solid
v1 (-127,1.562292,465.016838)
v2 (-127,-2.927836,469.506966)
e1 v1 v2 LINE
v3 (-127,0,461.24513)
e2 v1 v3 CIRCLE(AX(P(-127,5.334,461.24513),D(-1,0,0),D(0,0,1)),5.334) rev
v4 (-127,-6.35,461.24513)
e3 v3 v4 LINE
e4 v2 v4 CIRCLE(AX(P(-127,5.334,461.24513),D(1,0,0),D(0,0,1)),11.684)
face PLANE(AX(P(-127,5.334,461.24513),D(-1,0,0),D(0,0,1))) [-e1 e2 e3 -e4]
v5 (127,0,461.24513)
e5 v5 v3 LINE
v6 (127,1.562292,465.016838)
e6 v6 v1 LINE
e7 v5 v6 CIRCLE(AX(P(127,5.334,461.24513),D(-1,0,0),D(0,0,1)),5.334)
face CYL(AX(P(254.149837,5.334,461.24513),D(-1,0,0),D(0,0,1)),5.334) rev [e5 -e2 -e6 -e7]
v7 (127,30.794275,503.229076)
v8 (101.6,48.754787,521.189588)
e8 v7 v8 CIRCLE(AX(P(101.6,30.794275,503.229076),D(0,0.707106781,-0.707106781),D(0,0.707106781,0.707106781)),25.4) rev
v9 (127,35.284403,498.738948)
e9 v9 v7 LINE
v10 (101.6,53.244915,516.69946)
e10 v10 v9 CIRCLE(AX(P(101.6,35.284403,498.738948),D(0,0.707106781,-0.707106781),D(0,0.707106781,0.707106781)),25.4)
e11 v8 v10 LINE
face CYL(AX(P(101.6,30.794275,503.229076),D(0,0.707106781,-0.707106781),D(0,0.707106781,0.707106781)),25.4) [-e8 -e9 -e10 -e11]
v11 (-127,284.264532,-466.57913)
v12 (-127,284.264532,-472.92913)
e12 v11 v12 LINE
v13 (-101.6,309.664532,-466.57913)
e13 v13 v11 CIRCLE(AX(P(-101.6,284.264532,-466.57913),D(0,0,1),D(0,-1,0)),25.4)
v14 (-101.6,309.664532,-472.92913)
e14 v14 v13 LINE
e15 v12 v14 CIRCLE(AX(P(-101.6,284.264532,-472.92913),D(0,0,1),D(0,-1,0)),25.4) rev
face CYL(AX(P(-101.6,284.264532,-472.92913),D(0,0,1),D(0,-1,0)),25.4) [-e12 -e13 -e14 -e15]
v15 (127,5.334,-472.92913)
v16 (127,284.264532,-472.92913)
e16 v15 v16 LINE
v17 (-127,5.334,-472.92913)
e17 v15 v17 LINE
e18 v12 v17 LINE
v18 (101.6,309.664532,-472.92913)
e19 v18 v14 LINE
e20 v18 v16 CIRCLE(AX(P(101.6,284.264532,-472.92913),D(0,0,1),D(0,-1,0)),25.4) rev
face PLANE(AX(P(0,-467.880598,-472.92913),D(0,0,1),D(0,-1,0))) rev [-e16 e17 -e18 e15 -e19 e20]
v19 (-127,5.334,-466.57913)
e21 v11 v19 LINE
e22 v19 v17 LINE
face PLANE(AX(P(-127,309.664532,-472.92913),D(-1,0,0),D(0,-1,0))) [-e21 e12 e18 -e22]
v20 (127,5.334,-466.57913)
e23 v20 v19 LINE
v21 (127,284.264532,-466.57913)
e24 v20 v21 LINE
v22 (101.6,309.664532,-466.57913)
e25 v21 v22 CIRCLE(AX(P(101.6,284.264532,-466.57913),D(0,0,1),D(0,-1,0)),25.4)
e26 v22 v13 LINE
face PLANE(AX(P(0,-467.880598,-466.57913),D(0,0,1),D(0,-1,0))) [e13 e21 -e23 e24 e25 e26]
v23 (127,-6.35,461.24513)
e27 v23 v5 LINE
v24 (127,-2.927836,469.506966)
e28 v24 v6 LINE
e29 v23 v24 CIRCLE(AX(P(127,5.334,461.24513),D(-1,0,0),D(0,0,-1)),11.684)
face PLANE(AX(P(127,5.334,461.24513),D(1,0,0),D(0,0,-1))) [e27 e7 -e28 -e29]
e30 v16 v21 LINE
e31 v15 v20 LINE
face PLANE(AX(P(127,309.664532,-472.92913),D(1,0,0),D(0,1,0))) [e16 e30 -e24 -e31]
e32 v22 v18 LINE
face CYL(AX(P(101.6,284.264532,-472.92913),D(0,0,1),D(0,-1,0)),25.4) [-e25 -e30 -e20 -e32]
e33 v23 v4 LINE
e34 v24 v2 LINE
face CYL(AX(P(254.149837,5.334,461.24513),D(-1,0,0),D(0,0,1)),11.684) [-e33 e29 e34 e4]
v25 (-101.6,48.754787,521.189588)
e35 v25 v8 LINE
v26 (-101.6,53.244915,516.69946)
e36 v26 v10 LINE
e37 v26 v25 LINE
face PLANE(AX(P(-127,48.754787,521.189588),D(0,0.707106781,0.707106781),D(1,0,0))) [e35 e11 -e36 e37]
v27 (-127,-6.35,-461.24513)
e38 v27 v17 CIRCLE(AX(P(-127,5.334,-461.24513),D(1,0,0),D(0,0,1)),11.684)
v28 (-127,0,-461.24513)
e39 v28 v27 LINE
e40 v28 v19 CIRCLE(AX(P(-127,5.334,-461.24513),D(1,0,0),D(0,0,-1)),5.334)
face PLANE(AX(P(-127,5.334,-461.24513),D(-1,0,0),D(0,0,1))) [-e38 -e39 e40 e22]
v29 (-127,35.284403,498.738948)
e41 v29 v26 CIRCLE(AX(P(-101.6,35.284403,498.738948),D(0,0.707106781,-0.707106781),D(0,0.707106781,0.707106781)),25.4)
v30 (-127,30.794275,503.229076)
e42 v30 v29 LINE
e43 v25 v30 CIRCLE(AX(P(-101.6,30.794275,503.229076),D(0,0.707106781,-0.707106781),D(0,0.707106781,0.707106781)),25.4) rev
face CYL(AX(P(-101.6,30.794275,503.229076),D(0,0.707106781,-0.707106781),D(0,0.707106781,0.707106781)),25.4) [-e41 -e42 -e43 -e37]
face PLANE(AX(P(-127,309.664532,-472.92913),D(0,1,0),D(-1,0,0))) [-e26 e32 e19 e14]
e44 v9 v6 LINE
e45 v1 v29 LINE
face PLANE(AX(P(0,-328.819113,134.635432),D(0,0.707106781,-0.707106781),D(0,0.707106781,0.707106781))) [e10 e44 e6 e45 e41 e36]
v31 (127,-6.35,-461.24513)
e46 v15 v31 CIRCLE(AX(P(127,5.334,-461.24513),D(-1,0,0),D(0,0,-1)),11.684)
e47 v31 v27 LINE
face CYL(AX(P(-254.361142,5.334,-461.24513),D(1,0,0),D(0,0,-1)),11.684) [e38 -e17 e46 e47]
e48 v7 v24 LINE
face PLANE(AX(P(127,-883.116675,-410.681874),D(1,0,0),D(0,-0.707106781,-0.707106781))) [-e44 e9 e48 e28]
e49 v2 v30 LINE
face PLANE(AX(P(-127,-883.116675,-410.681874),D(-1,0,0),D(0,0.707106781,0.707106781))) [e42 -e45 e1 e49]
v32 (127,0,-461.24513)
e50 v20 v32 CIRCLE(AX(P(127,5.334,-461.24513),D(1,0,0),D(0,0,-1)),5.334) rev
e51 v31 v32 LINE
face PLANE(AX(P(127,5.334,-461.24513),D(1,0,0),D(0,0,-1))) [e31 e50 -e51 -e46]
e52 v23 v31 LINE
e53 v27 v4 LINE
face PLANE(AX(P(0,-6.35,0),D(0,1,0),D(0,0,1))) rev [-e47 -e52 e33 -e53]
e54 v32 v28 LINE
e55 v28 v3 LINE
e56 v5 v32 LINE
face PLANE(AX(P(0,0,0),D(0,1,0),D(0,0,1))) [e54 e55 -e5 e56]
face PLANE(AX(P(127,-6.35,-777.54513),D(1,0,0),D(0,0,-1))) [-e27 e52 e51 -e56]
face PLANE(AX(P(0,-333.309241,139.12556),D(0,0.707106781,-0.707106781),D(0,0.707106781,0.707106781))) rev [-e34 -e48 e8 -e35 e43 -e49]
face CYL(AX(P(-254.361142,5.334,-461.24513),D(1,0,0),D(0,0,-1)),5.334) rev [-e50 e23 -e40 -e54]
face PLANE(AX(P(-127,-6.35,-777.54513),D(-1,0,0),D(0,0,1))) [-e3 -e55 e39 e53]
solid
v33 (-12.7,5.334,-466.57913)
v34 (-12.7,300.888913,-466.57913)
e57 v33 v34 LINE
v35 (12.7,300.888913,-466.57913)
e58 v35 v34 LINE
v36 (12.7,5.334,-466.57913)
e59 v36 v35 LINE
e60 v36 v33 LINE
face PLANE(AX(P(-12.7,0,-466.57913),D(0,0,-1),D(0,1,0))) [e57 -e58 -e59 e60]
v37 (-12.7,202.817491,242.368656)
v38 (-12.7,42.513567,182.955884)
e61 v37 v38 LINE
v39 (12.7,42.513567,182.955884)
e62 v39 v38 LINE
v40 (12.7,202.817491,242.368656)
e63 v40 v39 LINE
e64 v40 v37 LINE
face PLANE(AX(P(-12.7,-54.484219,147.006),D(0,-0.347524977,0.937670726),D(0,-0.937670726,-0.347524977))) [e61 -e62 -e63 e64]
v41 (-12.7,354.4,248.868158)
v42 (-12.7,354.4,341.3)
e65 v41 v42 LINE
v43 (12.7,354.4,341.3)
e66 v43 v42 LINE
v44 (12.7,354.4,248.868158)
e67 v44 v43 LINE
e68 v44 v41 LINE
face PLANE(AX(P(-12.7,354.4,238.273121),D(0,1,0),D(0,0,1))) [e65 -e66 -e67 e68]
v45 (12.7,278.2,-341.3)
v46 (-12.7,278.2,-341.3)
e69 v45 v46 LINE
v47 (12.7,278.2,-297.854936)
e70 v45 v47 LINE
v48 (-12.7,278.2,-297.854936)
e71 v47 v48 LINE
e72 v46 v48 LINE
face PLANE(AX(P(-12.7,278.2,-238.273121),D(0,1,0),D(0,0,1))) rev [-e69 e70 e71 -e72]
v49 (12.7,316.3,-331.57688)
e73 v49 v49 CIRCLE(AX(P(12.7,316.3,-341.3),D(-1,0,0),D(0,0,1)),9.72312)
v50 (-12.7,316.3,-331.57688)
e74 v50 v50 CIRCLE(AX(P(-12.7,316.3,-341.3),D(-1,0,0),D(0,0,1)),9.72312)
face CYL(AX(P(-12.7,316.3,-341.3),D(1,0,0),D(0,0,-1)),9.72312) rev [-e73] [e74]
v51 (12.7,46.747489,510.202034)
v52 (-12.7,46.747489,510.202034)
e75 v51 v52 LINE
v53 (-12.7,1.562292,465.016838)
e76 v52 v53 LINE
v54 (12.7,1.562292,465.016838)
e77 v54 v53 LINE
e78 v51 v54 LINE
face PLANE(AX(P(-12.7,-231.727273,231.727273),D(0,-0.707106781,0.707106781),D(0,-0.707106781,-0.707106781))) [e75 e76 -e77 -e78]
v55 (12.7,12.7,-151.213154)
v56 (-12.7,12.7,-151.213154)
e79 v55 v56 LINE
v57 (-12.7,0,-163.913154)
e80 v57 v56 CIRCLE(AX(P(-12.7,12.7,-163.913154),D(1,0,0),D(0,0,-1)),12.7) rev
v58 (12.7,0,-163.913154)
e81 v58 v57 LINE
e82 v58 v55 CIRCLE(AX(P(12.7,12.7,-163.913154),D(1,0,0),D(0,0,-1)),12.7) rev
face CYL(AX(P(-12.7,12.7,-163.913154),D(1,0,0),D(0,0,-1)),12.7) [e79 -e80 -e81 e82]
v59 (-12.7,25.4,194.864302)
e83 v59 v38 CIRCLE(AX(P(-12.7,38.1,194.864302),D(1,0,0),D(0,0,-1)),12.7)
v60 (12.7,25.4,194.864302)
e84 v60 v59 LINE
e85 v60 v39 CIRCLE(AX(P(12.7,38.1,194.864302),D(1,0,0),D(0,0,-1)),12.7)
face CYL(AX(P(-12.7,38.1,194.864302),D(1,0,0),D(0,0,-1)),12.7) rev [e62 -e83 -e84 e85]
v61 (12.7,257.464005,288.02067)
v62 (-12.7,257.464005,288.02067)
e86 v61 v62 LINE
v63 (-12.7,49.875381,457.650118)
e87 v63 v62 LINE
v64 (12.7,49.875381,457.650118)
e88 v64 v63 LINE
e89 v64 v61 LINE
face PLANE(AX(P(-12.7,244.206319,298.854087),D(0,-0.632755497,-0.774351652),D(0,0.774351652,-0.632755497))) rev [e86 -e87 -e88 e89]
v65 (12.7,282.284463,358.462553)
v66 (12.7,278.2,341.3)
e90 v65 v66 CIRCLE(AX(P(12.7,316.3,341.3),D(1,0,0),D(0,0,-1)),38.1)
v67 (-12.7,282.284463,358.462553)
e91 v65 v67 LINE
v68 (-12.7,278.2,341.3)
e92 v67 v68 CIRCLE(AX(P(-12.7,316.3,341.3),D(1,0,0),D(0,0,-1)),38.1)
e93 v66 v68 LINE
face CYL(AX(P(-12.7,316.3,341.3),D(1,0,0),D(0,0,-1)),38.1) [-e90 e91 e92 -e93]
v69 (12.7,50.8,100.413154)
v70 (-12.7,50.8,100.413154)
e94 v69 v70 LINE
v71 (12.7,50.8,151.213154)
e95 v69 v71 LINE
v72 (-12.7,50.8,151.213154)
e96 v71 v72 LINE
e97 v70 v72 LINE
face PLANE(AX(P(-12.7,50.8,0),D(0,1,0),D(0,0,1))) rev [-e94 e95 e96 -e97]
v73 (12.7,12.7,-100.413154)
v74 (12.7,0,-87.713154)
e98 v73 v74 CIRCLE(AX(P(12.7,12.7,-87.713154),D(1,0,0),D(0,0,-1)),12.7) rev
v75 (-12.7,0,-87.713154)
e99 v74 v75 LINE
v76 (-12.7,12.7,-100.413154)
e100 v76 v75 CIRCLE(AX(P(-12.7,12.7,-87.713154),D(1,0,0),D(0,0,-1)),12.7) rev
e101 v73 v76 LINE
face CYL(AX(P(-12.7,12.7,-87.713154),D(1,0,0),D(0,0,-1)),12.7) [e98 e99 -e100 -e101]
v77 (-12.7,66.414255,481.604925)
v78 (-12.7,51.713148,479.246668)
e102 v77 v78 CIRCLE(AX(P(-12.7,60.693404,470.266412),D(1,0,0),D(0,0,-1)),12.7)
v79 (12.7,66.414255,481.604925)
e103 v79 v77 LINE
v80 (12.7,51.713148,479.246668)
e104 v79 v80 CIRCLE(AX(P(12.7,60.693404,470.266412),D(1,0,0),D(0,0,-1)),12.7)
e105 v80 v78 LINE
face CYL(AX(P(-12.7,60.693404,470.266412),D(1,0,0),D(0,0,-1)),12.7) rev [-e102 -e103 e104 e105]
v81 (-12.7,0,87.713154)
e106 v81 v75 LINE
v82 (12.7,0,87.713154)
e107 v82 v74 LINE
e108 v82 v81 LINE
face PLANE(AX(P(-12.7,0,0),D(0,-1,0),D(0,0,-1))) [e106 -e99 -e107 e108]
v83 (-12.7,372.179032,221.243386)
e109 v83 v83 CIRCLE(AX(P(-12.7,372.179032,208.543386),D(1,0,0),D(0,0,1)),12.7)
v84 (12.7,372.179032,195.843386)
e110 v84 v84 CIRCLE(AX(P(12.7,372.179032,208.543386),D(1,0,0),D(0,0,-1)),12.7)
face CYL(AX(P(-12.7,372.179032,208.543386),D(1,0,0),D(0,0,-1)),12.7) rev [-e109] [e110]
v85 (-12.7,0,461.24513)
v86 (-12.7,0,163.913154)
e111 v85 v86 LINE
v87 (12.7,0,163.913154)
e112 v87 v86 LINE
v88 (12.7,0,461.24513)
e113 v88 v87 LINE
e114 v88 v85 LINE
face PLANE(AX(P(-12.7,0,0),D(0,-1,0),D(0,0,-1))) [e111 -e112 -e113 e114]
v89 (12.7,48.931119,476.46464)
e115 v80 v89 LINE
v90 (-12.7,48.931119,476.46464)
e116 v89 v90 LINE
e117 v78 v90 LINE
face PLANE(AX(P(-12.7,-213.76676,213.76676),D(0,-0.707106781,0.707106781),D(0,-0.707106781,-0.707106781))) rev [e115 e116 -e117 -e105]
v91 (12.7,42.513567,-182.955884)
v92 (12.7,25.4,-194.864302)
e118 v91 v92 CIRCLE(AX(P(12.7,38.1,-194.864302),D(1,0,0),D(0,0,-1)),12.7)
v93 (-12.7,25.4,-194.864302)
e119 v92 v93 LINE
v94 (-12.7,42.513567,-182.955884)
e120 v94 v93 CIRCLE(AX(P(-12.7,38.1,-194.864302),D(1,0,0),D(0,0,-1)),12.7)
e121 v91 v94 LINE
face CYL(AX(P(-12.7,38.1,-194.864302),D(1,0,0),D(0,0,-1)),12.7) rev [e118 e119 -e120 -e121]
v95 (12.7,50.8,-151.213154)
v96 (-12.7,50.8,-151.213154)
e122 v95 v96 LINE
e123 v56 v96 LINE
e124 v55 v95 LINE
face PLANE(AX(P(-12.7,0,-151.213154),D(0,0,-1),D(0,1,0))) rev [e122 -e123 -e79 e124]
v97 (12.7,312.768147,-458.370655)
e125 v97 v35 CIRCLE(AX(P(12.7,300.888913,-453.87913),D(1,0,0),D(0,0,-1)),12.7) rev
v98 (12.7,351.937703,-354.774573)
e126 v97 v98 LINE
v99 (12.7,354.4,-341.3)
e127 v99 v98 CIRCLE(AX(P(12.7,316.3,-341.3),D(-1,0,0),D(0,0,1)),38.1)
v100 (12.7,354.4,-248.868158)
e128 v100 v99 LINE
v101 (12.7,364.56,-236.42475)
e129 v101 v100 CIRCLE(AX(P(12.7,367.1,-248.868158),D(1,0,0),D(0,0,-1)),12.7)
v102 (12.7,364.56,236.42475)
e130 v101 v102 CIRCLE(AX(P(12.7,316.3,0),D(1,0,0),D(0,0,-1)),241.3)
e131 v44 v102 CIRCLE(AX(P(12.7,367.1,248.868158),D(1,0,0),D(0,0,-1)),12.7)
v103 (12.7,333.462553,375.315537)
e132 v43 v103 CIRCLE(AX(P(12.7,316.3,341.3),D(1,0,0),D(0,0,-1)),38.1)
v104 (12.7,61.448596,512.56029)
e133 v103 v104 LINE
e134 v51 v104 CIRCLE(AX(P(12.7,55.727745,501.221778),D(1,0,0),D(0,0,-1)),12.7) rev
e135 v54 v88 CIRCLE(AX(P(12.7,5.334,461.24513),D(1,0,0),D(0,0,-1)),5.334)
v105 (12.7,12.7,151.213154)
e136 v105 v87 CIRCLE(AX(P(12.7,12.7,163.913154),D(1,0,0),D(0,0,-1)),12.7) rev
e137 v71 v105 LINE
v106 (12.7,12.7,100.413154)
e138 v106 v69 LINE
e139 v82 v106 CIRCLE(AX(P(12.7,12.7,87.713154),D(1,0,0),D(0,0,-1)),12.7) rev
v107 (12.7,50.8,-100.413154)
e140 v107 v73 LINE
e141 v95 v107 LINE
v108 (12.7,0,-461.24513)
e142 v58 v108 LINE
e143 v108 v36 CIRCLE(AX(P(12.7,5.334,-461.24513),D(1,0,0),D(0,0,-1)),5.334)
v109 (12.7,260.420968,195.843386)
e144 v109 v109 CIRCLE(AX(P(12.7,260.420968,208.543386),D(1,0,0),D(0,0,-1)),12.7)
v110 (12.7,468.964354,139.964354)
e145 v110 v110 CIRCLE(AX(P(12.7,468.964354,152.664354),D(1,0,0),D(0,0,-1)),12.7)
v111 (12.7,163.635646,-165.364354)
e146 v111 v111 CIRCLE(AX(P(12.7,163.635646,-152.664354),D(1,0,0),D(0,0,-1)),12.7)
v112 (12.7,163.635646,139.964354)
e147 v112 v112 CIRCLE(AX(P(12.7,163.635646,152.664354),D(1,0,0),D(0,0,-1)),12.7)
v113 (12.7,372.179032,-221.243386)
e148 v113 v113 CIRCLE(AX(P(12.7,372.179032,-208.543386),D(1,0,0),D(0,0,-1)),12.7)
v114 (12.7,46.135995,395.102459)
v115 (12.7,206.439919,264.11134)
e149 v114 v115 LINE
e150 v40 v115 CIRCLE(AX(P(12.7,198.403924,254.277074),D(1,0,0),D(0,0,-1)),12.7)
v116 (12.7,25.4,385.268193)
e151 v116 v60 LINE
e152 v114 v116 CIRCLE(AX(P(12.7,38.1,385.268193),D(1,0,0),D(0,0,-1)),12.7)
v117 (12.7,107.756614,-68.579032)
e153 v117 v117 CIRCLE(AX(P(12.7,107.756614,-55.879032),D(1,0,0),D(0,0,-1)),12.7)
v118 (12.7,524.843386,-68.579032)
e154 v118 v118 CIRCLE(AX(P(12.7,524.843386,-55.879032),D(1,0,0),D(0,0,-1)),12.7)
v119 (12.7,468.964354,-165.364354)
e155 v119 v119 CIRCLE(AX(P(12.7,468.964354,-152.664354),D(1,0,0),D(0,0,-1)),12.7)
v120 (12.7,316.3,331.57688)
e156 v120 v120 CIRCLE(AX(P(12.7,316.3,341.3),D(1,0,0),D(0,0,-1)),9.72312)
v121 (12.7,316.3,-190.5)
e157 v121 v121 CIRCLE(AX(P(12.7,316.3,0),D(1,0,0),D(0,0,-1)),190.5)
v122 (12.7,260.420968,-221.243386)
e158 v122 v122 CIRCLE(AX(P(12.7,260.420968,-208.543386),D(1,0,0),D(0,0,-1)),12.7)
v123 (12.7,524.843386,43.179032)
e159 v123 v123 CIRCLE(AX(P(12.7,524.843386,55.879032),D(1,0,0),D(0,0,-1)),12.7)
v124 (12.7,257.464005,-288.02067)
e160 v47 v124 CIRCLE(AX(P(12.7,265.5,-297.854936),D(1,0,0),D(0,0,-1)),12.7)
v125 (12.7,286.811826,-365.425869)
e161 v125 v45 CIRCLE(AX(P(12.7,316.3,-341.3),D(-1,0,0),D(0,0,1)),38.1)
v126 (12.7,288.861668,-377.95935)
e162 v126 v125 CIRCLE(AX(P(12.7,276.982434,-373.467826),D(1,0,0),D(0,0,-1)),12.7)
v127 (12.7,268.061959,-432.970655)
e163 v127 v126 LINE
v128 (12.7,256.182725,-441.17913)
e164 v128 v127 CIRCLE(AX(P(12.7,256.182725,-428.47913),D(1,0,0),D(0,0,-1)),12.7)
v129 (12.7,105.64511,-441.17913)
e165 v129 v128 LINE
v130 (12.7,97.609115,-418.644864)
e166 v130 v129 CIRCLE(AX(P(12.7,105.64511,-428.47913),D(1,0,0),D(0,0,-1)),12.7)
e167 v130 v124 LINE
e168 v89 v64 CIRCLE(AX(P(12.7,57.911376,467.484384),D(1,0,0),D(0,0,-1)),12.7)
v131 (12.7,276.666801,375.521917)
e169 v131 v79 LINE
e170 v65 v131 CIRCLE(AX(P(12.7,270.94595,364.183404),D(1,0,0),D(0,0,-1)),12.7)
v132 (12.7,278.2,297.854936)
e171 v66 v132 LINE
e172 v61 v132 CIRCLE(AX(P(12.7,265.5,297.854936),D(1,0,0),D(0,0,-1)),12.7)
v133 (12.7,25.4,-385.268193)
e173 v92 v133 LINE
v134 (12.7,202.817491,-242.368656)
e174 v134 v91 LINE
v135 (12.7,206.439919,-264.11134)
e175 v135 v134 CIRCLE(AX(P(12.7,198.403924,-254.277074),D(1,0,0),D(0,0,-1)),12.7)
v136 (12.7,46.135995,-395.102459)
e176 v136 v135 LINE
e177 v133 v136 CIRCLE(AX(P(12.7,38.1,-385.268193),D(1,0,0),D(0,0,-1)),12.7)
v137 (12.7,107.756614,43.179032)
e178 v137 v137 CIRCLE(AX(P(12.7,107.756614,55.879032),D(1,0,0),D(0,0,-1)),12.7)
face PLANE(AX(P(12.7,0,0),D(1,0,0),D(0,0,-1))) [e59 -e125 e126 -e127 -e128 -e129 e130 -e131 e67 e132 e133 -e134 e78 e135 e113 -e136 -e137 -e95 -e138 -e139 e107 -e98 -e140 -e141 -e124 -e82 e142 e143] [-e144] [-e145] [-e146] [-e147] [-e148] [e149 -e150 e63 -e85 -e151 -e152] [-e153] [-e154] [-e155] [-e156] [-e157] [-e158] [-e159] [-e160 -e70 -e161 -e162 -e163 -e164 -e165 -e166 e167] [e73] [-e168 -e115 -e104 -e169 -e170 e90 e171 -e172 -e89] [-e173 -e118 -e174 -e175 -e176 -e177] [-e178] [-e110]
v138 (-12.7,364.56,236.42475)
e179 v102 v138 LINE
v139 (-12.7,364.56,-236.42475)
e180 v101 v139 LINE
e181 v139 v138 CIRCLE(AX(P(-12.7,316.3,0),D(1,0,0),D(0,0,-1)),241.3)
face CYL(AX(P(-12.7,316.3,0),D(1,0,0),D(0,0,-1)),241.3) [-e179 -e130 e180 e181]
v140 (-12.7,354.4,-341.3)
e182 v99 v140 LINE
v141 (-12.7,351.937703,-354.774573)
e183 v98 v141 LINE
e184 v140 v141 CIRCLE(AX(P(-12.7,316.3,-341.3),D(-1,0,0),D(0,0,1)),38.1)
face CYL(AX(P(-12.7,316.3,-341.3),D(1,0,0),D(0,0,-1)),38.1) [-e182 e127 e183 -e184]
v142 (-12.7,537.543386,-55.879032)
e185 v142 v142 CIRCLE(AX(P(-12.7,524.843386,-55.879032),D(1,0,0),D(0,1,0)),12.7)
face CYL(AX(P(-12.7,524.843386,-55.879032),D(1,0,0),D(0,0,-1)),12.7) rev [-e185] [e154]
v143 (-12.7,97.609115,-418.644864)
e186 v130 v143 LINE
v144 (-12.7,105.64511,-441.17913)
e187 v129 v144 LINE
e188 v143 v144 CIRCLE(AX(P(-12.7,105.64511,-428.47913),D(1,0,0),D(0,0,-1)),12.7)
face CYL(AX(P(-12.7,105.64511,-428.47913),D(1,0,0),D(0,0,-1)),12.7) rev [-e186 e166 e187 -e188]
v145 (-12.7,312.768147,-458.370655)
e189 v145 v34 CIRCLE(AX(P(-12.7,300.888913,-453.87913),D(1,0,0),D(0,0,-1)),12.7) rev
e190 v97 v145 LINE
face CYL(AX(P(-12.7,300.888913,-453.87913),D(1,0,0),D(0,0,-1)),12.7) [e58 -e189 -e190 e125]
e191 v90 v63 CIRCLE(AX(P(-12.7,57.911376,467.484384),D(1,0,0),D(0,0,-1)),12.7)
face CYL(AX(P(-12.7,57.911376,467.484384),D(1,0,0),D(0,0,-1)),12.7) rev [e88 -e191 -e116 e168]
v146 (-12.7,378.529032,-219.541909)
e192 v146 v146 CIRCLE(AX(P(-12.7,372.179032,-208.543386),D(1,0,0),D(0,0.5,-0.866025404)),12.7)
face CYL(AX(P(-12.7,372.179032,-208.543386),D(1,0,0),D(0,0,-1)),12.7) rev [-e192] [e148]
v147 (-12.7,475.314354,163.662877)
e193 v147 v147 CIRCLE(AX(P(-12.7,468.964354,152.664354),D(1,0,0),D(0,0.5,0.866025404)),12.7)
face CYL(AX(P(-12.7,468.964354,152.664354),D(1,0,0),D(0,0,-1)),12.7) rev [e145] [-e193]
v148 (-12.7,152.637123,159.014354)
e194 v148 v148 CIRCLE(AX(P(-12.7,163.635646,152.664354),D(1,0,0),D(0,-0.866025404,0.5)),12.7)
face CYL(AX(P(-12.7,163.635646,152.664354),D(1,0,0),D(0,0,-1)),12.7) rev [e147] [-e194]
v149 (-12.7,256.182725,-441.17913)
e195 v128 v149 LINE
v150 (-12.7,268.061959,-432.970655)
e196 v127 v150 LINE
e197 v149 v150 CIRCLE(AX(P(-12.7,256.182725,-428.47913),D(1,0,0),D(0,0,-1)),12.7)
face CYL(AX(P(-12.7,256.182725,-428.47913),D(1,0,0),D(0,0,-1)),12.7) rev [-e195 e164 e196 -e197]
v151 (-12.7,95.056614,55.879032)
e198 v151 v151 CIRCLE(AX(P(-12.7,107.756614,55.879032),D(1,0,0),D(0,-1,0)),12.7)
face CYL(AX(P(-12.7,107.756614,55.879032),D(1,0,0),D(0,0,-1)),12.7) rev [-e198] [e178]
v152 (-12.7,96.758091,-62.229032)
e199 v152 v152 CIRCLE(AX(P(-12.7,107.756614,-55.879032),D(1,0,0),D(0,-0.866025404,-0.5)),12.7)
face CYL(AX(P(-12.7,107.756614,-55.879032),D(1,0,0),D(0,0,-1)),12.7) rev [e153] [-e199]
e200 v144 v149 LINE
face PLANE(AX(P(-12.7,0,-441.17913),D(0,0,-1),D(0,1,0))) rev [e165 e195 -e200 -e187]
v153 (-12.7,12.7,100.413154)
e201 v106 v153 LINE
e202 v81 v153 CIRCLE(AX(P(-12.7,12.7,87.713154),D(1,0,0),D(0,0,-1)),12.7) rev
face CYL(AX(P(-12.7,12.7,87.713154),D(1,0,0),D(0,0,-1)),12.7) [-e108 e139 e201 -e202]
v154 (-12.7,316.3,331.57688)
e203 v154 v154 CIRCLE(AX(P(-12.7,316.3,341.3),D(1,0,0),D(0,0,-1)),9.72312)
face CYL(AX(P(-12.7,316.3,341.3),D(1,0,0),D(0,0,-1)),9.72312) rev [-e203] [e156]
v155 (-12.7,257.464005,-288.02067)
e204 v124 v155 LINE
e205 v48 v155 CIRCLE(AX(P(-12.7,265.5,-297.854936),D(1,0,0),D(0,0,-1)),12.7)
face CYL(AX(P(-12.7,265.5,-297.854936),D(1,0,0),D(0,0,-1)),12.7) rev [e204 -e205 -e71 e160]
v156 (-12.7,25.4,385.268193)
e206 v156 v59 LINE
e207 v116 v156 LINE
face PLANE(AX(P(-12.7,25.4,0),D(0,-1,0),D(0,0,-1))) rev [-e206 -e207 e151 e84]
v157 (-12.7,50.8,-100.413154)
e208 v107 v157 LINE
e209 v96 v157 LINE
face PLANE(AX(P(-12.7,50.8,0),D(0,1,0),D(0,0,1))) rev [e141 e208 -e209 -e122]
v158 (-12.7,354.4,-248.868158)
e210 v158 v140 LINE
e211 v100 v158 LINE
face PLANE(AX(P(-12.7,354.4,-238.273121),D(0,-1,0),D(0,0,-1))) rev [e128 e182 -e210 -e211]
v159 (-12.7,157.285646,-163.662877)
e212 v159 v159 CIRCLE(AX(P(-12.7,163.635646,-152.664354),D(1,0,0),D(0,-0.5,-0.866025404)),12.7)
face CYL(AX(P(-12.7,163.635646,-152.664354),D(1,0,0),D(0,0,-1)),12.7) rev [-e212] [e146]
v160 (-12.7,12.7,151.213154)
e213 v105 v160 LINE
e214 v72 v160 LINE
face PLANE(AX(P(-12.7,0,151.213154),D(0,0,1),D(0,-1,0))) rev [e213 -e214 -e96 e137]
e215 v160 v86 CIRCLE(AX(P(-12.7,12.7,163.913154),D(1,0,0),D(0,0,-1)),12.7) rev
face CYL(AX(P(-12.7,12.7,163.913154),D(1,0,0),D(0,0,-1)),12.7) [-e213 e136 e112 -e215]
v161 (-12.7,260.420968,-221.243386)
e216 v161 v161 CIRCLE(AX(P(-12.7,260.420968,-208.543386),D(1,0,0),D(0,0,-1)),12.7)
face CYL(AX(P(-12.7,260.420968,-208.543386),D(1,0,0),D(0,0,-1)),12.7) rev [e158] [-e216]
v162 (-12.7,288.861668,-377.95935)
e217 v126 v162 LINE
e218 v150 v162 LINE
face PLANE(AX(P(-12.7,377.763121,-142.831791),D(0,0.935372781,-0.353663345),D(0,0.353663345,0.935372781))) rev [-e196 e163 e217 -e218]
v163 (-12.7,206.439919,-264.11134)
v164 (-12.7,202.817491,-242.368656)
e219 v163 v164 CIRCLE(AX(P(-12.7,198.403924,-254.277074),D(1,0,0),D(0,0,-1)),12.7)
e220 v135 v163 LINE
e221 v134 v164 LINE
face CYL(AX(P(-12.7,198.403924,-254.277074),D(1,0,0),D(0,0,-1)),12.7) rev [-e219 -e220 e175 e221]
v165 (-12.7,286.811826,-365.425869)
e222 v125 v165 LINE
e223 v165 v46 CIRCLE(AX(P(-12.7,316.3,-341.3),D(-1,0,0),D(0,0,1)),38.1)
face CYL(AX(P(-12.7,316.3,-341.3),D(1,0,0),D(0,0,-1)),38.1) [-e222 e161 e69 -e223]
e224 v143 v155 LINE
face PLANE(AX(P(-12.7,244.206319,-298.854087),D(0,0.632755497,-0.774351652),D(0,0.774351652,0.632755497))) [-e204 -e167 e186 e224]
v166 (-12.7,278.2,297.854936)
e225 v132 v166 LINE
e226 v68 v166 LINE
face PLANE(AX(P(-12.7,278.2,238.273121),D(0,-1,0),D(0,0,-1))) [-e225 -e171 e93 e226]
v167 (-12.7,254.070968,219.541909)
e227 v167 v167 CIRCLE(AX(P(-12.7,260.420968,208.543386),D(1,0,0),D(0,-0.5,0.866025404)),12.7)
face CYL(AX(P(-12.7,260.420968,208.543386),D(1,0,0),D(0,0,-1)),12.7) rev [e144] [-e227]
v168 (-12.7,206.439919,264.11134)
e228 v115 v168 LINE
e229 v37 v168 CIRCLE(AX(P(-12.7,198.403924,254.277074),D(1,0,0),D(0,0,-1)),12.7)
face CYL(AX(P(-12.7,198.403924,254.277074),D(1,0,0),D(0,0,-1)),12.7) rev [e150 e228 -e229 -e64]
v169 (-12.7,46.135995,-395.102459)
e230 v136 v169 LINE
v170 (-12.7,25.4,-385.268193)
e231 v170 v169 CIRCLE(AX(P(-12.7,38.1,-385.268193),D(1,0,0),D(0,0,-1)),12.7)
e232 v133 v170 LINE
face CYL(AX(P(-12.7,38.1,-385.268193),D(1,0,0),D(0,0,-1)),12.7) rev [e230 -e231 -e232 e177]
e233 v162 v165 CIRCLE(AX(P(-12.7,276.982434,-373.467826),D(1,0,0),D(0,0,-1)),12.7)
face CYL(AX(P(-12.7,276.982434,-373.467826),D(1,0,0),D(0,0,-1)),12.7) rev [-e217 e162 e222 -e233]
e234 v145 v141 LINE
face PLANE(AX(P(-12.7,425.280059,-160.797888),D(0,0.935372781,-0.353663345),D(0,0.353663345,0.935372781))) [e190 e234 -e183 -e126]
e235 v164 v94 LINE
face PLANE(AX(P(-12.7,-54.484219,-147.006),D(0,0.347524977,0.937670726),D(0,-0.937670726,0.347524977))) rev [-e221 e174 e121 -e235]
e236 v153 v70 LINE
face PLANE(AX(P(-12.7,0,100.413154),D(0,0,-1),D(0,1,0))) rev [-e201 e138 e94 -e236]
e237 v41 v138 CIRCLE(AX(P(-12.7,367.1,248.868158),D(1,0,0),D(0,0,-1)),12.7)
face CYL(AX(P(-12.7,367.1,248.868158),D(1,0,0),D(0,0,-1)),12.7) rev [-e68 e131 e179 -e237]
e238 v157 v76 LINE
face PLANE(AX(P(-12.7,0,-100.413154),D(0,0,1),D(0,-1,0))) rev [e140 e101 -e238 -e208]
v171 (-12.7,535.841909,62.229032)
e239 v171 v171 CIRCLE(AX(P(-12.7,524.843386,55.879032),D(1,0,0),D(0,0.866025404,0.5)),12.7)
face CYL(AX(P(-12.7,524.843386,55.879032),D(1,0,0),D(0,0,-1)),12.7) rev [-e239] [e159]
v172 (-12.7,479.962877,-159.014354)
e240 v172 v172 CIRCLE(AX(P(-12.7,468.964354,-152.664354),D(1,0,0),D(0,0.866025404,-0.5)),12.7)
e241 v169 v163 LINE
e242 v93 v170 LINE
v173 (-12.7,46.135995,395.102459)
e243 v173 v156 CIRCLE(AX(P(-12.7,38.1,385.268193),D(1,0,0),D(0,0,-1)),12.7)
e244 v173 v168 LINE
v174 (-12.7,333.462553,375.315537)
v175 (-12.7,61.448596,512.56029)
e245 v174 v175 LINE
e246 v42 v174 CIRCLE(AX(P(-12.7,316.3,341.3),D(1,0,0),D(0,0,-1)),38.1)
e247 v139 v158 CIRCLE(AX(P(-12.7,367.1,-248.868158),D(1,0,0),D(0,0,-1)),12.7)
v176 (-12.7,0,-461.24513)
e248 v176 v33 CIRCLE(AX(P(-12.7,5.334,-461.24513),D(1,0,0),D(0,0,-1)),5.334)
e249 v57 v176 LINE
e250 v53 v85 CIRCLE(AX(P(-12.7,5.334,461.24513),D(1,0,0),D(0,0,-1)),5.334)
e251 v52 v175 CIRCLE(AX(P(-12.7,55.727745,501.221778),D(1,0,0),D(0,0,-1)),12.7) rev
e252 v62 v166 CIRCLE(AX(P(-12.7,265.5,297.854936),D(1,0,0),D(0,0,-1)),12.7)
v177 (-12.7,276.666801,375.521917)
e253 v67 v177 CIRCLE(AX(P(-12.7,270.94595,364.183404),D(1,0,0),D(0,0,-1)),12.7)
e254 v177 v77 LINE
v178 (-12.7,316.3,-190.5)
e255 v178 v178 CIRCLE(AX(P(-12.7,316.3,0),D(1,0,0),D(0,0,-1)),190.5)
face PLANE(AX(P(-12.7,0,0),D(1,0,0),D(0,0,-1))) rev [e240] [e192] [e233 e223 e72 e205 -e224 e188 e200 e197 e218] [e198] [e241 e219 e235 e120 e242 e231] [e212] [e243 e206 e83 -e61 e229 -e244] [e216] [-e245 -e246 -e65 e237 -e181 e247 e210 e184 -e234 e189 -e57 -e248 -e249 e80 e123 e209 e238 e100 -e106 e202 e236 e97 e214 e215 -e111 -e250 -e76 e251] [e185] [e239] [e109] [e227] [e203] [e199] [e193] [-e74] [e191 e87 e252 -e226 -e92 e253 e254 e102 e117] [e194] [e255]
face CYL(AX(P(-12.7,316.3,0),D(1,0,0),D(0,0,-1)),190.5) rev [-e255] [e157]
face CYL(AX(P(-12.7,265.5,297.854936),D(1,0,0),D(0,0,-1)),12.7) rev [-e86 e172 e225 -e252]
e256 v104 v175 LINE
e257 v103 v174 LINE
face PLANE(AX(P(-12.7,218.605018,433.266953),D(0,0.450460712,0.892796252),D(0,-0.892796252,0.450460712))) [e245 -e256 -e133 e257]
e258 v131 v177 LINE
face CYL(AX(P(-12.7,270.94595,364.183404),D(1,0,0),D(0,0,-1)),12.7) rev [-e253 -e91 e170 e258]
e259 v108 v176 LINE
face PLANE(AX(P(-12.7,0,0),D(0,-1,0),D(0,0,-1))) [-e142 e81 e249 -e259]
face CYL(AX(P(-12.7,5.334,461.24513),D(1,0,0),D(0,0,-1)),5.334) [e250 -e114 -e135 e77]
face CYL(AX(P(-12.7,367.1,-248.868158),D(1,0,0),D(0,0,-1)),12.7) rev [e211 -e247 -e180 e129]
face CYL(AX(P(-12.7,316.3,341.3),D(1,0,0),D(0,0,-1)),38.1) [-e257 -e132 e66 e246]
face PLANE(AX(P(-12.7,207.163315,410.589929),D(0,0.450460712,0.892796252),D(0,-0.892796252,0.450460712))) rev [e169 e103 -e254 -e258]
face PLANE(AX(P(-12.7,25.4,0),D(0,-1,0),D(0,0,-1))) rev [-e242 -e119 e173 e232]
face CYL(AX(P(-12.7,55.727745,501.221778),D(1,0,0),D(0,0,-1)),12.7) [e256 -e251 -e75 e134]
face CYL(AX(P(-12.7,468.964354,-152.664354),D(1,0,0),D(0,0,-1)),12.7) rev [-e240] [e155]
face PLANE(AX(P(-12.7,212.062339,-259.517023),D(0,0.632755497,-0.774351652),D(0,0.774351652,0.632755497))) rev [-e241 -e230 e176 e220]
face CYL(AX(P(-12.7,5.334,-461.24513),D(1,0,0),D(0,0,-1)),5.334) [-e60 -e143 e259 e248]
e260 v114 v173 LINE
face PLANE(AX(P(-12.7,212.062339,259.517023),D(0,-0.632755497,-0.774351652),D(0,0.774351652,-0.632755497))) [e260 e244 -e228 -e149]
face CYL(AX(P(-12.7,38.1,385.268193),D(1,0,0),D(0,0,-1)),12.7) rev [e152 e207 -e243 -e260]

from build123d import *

# Parameters (mm, degrees)
FLANGE_PROFILE_DEPTH                = 12.7
F_7_8_1_DIAMETER_HOLE1_D            = 25.4
BOLT_PATTERN_COUNT                  = 12
SKETCH15_R                          = 9.72312
BOSS_EXTRUDE1_DEPTH                 = 12.7
SKETCH5_W                           = 254
SKETCH5_H                           = 1317.865260112
BASE_SKID_DEPTH                     = 6.35
BEND_START                          = -127
BEND_HEEL_DEPTH                     = 254
BEND_HEEL_2_DEPTH                   = 254
BEND_TOE_DEPTH                      = 254
BEND_TOE_2_DEPTH                    = 254
WEBBING_EXTRUDE_DEPTH               = 12.7
WEBBING_FILLET_R                    = 12.7
SKID_START                          = -472.929130056
SKID_EDGES_DEPTH                    = 6.35
SKID_START_2                        = -334.061851681
SKID_EDGES_2_DEPTH                  = 6.35
FLANGE_FILLET_R                     = 12.7
CONVERT_START                       = -12.7
CONVERT_FLANGE_TO_SHEET_OUTLINE_R   = 12.7
CONVERT_FLANGE_TO_SHEET_OUTLINE_R_2 = 9.72312
CONVERT_FLANGE_TO_SHEET_OUTLINE_R_3 = 190.5
CONVERT_FLANGE_TO_SHEET_DEPTH       = 25.4


# Read off the part's stored shape, not the designer's step: Bend Heel, Bend Toe, Skid Edges, Convert Flange to Sheet
# Sheet-metal steps are written as plain solids
with BuildPart() as part:
    # Sketch1 → Flange Profile (new, symmetric)
    with BuildSketch(Plane(origin=(0, 0, 0), x_dir=(0, 0, -1), z_dir=(1, 0, 0))):
        with BuildLine():
            ThreePointArc((-190.5, 316.3), (0, 506.8), (190.5, 316.3))
            Line((190.5, 316.3), (241.3, 316.3))
            ThreePointArc((241.3, 316.3), (0, 557.6), (-241.3, 316.3))
            Line((-241.3, 316.3), (-190.5, 316.3))
        make_face()
        with BuildLine():
            Line((241.3, 316.3), (190.5, 316.3))
            ThreePointArc((190.5, 316.3), (0, 125.8), (-190.5, 316.3))
            Line((-190.5, 316.3), (-241.3, 316.3))
            ThreePointArc((-241.3, 316.3), (0, 75), (241.3, 316.3))
        make_face()
    extrude(amount=FLANGE_PROFILE_DEPTH, both=True)

    # 7/8 (1) Diameter Hole1 (through all)
    with Locations(Plane(origin=(12.7, 260.420968162, -208.543385896), x_dir=(0, 0, 1), z_dir=(1, 0, 0))):
        with Locations((0, 0)):
            f_7_8_1_diameter_hole1 = Hole(F_7_8_1_DIAMETER_HOLE1_D / 2)

    # Bolt Pattern: 7/8 (1) Diameter Hole1 ×12 about axis
    bolt_pattern_axis = Axis((0, 316.3, 0), (1, 0, 0))
    for i in range(1, BOLT_PATTERN_COUNT):
        add(f_7_8_1_diameter_hole1.rotate(bolt_pattern_axis, i * 360 / BOLT_PATTERN_COUNT), mode=Mode.SUBTRACT)

    # Sketch15 → Boss-Extrude1 (add, symmetric)
    with BuildSketch(Plane(origin=(0, 0, 0), x_dir=(0, 0, -1), z_dir=(1, 0, 0))):
        with BuildLine():
            Line((-238.273120599, 278.2), (-341.3, 278.2))
            ThreePointArc((-341.3, 278.2), (-379.4, 316.3), (-341.3, 354.4))
            Line((-341.3, 354.4), (-238.273120599, 354.4))
            ThreePointArc((-238.273120599, 354.4), (-200.173120599, 316.3), (-238.273120599, 278.2))
        make_face()
        with Locations((-341.3, 316.3)):
            Circle(SKETCH15_R, mode=Mode.SUBTRACT)
    boss_extrude1 = extrude(amount=BOSS_EXTRUDE1_DEPTH, both=True)

    # Mirror2: Boss-Extrude1 across plane
    add(boss_extrude1.mirror(Plane.XY))

    # webbing → Webbing Extrude (add, symmetric)
    with BuildSketch(Plane(origin=(0, 0, 0), x_dir=(0, 0, -1), z_dir=(1, 0, 0))):
        with BuildLine():
            ThreePointArc((238.273120599, 278.2), (0, 75), (-238.273120599, 278.2))
            Line((-238.273120599, 278.2), (-271.07641131, 278.2))
            Line((-271.07641131, 278.2), (-466.535353829, 39.001833116))
            Line((-466.535353829, 39.001833116), (-485.744094857, 58.210574144))
            Line((-485.744094857, 58.210574144), (-380.664844281, 266.473711409))
            Line((-380.664844281, 266.473711409), (-368.819522655, 289.950695021))
            ThreePointArc((-368.819522655, 289.950695021), (-378.982374479, 310.674286388), (-375.315537192, 333.462553119))
            Line((-375.315537192, 333.462553119), (-516.69946035, 53.244915153))
            Line((-516.69946035, 53.244915153), (-465.016837626, 1.562292429))
            ThreePointArc((-465.016837626, 1.562292429), (-463.286363484, 0.406026574), (-461.245130056, 0))
            Line((-461.245130056, 0), (-151.213153751, 0))
            Line((-151.213153751, 0), (-151.213153751, 50.8))
            Line((-151.213153751, 50.8), (-100.413153751, 50.8))
            Line((-100.413153751, 50.8), (-100.413153751, 0))
            Line((-100.413153751, 0), (100.413153751, 0))
            Line((100.413153751, 0), (100.413153751, 50.8))
            Line((100.413153751, 50.8), (151.213153751, 50.8))
            Line((151.213153751, 50.8), (151.213153751, 0))
            Line((151.213153751, 0), (176.613153751, 0))
            Line((176.613153751, 0), (461.245130056, 0))
            ThreePointArc((461.245130056, 0), (465.016837626, 1.562292429), (466.579130056, 5.334))
            Line((466.579130056, 5.334), (466.579130056, 309.66453199))
            Line((466.579130056, 309.66453199), (354.774573435, 351.937702939))
            ThreePointArc((354.774573435, 351.937702939), (378.177611201, 325.873494246), (370.408024073, 291.716816021))
            Line((370.408024073, 291.716816021), (441.179130056, 264.958344347))
            Line((441.179130056, 264.958344347), (441.179130056, 70.03219769))
            Line((441.179130056, 70.03219769), (271.07641131, 278.2))
            Line((271.07641131, 278.2), (238.273120599, 278.2))
        make_face()
        Polygon((-176.613153751, 25.4), (-412.046717792, 25.4), (-250.076782577, 223.615088522), align=None, mode=Mode.SUBTRACT)
        Polygon((412.046717792, 25.4), (176.613153751, 25.4), (250.076782577, 223.615088522), align=None, mode=Mode.SUBTRACT)
    extrude(amount=WEBBING_EXTRUDE_DEPTH, both=True)

    # Webbing Fillet
    webbing_fillet_edges = [part.edges().sort_by_distance(p)[0] for p in [
        (0, 25.4, 412.046717792),
        (0, 223.615088522, 250.076782577),
        (0, 289.950695021, 368.819522655),
        (0, 291.716816021, -370.408024073),
        (0, 264.958344347, -441.179130056),
        (0, 70.03219769, -441.179130056),
        (0, 278.2, -271.07641131),
        (0, 278.2, 271.07641131),
        (0, 39.001833116, 466.535353829),
        (0, 25.4, -412.046717792),
        (0, 25.4, -176.613153751),
        (0, 58.210574144, 485.744094857),
        (0, 223.615088522, -250.076782577),
        (0, 25.4, 176.613153751),
    ]]
    fillet(webbing_fillet_edges, radius=WEBBING_FILLET_R)

    # Flange Fillet
    flange_fillet_edges = [part.edges().sort_by_distance(p)[0] for p in [
        (0, 53.244915153, 516.69946035),
        (0, 0, 151.213153751),
        (0, 0, 100.413153751),
        (0, 0, -100.413153751),
        (0, 0, -151.213153751),
        (0, 309.66453199, -466.579130056),
        (0, 354.4, 238.273120599),
        (0, 354.4, -238.273120599),
    ]]
    fillet(flange_fillet_edges, radius=FLANGE_FILLET_R)


with BuildPart() as body_2:
    # Sketch5 → Base Skid (new body)
    with BuildSketch(Plane(origin=(0, 0, 0), x_dir=(1, 0, 0), z_dir=(0, 1, 0))):
        with Locations((0, 118.6125)):
            Rectangle(SKETCH5_W, SKETCH5_H)
    extrude(amount=-BASE_SKID_DEPTH)

    # Bend Heel outline → Bend Heel (cut)
    with BuildSketch(Plane.YZ.offset(BEND_START)):
        with BuildLine():
            Line((0, -777.545130056), (0, -471.640528076))
            ThreePointArc((0, -471.640528076), (-4.636915504, -467.33583609), (-6.35, -461.245130056))
            Line((-6.35, -461.245130056), (-6.35, -777.545130056))
            Line((-6.35, -777.545130056), (0, -777.545130056))
        make_face()
    extrude(amount=BEND_HEEL_DEPTH, mode=Mode.SUBTRACT)

    # Bend Heel 2 outline → Bend Heel 2 (add)
    with BuildSketch(Plane.YZ.offset(BEND_START)):
        with BuildLine():
            Line((5.334, -472.929130056), (309.66453199, -472.929130056))
            Line((309.66453199, -472.929130056), (309.66453199, -466.579130056))
            Line((309.66453199, -466.579130056), (5.334, -466.579130056))
            ThreePointArc((5.334, -466.579130056), (1.56229243, -465.016837626), (0, -461.245130056))
            Line((0, -461.245130056), (0, -471.640528076))
            ThreePointArc((0, -471.640528076), (2.590277571, -472.602411563), (5.334, -472.929130056))
        make_face()
    extrude(amount=BEND_HEEL_2_DEPTH)

    # Bend Toe outline → Bend Toe (cut)
    with BuildSketch(Plane.YZ.offset(BEND_START)):
        with BuildLine():
            Line((-6.35, 540.320130056), (-6.35, 461.245130056))
            ThreePointArc((-6.35, 461.245130056), (-5.460608458, 465.71640328), (-2.927835631, 469.506965687))
            Line((-2.927835631, 469.506965687), (0, 472.434801318))
            Line((0, 472.434801318), (0, 540.320130056))
            Line((0, 540.320130056), (-6.35, 540.320130056))
        make_face()
    extrude(amount=BEND_TOE_DEPTH, mode=Mode.SUBTRACT)

    # Bend Toe 2 outline → Bend Toe 2 (add)
    with BuildSketch(Plane.YZ.offset(BEND_START)):
        with BuildLine():
            Line((48.754787092, 521.189588411), (0, 472.434801318))
            Line((0, 472.434801318), (0, 461.245130056))
            ThreePointArc((0, 461.245130056), (0.406026574, 463.286363484), (1.562292429, 465.016837626))
            Line((1.562292429, 465.016837626), (53.244915153, 516.69946035))
            Line((53.244915153, 516.69946035), (48.754787092, 521.189588411))
        make_face()
    extrude(amount=BEND_TOE_2_DEPTH)

    # Skid Edges outline → Skid Edges (cut)
    with BuildSketch(Plane.XY.offset(SKID_START)):
        with BuildLine():
            ThreePointArc((-127, 284.26453199), (-119.560512242, 302.225044232), (-101.6, 309.66453199))
            Line((-101.6, 309.66453199), (-127, 309.66453199))
            Line((-127, 309.66453199), (-127, 284.26453199))
        make_face()
        with BuildLine():
            ThreePointArc((101.6, 309.66453199), (119.560512242, 302.225044232), (127, 284.26453199))
            Line((127, 284.26453199), (127, 309.66453199))
            Line((127, 309.66453199), (101.6, 309.66453199))
        make_face()
    extrude(amount=SKID_EDGES_DEPTH, mode=Mode.SUBTRACT)

    # Skid Edges 2 outline → Skid Edges 2 (cut)
    with BuildSketch(Plane(origin=(0, 0, 0), x_dir=(1, 0, 0), z_dir=(0, 0.707106781186546, -0.707106781186549)).offset(SKID_START_2)):
        with BuildLine():
            Line((-127, -403.011532817), (-101.6, -403.011532817))
            ThreePointArc((-101.6, -403.011532817), (-119.560512242, -395.572045059), (-127, -377.611532817))
            Line((-127, -377.611532817), (-127, -403.011532817))
        make_face()
        with BuildLine():
            ThreePointArc((127, -377.611532817), (119.560512242, -395.572045059), (101.6, -403.011532817))
            Line((101.6, -403.011532817), (127, -403.011532817))
            Line((127, -403.011532817), (127, -377.611532817))
        make_face()
    extrude(amount=SKID_EDGES_2_DEPTH, mode=Mode.SUBTRACT)


with BuildPart() as body_3:
    # Convert Flange to Sheet outline → Convert Flange to Sheet (new body)
    with BuildSketch(Plane.YZ.offset(CONVERT_START)):
        with BuildLine():
            ThreePointArc((354.4, 341.3), (348.746134391, 361.271438683), (333.462553119, 375.315537192))
            Line((333.462553119, 375.315537192), (61.448595688, 512.560290001))
            ThreePointArc((61.448595688, 512.560290001), (53.716209529, 513.761463663), (46.747488527, 510.202033725))
            Line((46.747488527, 510.202033725), (1.562292429, 465.016837626))
            ThreePointArc((1.562292429, 465.016837626), (0.406026574, 463.286363484), (0, 461.245130056))
            Line((0, 461.245130056), (0, 163.913153751))
            ThreePointArc((0, 163.913153751), (3.719743879, 154.93289763), (12.7, 151.213153751))
            Line((12.7, 151.213153751), (50.8, 151.213153751))
            Line((50.8, 151.213153751), (50.8, 100.413153751))
            Line((50.8, 100.413153751), (12.7, 100.413153751))
            ThreePointArc((12.7, 100.413153751), (3.719743879, 96.693409872), (0, 87.713153751))
            Line((0, 87.713153751), (0, -87.713153751))
            ThreePointArc((0, -87.713153751), (3.719743879, -96.693409872), (12.7, -100.413153751))
            Line((12.7, -100.413153751), (50.8, -100.413153751))
            Line((50.8, -100.413153751), (50.8, -151.213153751))
            Line((50.8, -151.213153751), (12.7, -151.213153751))
            ThreePointArc((12.7, -151.213153751), (3.719743879, -154.93289763), (0, -163.913153751))
            Line((0, -163.913153751), (0, -461.245130056))
            ThreePointArc((0, -461.245130056), (1.56229243, -465.016837626), (5.334, -466.579130056))
            Line((5.334, -466.579130056), (300.888912587, -466.579130056))
            ThreePointArc((300.888912587, -466.579130056), (308.108595375, -464.327392133), (312.7681469, -458.370654534))
            Line((312.7681469, -458.370654534), (351.937702939, -354.774573435))
            ThreePointArc((351.937702939, -354.774573435), (353.779370872, -348.148850927), (354.4, -341.3))
            Line((354.4, -341.3), (354.4, -248.868157867))
            ThreePointArc((354.4, -248.868157867), (357.262622301, -240.83597261), (364.56, -236.424749973))
            ThreePointArc((364.56, -236.424749973), (557.6, 0), (364.56, 236.424749973))
            ThreePointArc((364.56, 236.424749973), (357.262622301, 240.83597261), (354.4, 248.868157867))
            Line((354.4, 248.868157867), (354.4, 341.3))
        make_face()
        with BuildLine():
            ThreePointArc((46.135994814, -395.102459099), (32.65790179, -396.74310345), (25.4, -385.26819312))
            Line((25.4, -385.26819312), (25.4, -194.864301774))
            ThreePointArc((25.4, -194.864301774), (30.846114958, -184.439756133), (42.513567213, -182.955883556))
            Line((42.513567213, -182.955883556), (202.817491303, -242.368656148))
            ThreePointArc((202.817491303, -242.368656148), (210.931253322, -252.189965766), (206.439918904, -264.111340345))
            Line((206.439918904, -264.111340345), (46.135994814, -395.102459099))
        make_face(mode=Mode.SUBTRACT)
        with BuildLine():
            ThreePointArc((257.464005186, -288.020670003), (270.94209821, -286.380025652), (278.2, -297.854935982))
            Line((278.2, -297.854935982), (278.2, -341.3))
            ThreePointArc((278.2, -341.3), (280.417487243, -354.108406547), (286.811825631, -365.42586936))
            ThreePointArc((286.811825631, -365.42586936), (289.515915106, -371.417982957), (288.861668487, -377.959350292))
            Line((288.861668487, -377.959350292), (268.061959257, -432.970654534))
            ThreePointArc((268.061959257, -432.970654534), (263.402407732, -438.927392133), (256.182724944, -441.179130056))
            Line((256.182724944, -441.179130056), (105.645109911, -441.179130056))
            ThreePointArc((105.645109911, -441.179130056), (93.682978455, -432.744972415), (97.609115097, -418.644864077))
            Line((97.609115097, -418.644864077), (257.464005186, -288.020670003))
        make_face(mode=Mode.SUBTRACT)
        with Locations((107.756614104, -55.879031838)):
            Circle(CONVERT_FLANGE_TO_SHEET_OUTLINE_R, mode=Mode.SUBTRACT)
        with Locations((163.635645942, -152.664354058)):
            Circle(CONVERT_FLANGE_TO_SHEET_OUTLINE_R, mode=Mode.SUBTRACT)
        with Locations((260.420968162, -208.543385896)):
            Circle(CONVERT_FLANGE_TO_SHEET_OUTLINE_R, mode=Mode.SUBTRACT)
        with Locations((316.3, -341.3)):
            Circle(CONVERT_FLANGE_TO_SHEET_OUTLINE_R_2, mode=Mode.SUBTRACT)
        with Locations((372.179031838, -208.543385896)):
            Circle(CONVERT_FLANGE_TO_SHEET_OUTLINE_R, mode=Mode.SUBTRACT)
        with Locations((316.3, 0)):
            Circle(CONVERT_FLANGE_TO_SHEET_OUTLINE_R_3, mode=Mode.SUBTRACT)
        with Locations((468.964354058, -152.664354058)):
            Circle(CONVERT_FLANGE_TO_SHEET_OUTLINE_R, mode=Mode.SUBTRACT)
        with Locations((524.843385896, -55.879031838)):
            Circle(CONVERT_FLANGE_TO_SHEET_OUTLINE_R, mode=Mode.SUBTRACT)
        with Locations((107.756614104, 55.879031838)):
            Circle(CONVERT_FLANGE_TO_SHEET_OUTLINE_R, mode=Mode.SUBTRACT)
        with Locations((163.635645942, 152.664354058)):
            Circle(CONVERT_FLANGE_TO_SHEET_OUTLINE_R, mode=Mode.SUBTRACT)
        with Locations((260.420968162, 208.543385896)):
            Circle(CONVERT_FLANGE_TO_SHEET_OUTLINE_R, mode=Mode.SUBTRACT)
        with BuildLine():
            Line((46.135994814, 395.102459099), (206.439918904, 264.111340345))
            ThreePointArc((206.439918904, 264.111340345), (210.931253322, 252.189965766), (202.817491303, 242.368656148))
            Line((202.817491303, 242.368656148), (42.513567213, 182.955883556))
            ThreePointArc((42.513567213, 182.955883556), (30.846114958, 184.439756133), (25.4, 194.864301774))
            Line((25.4, 194.864301774), (25.4, 385.26819312))
            ThreePointArc((25.4, 385.26819312), (32.65790179, 396.74310345), (46.135994814, 395.102459099))
        make_face(mode=Mode.SUBTRACT)
        with BuildLine():
            ThreePointArc((282.284462808, 358.462553119), (279.235178626, 350.120941928), (278.2, 341.3))
            Line((278.2, 341.3), (278.2, 297.854935982))
            ThreePointArc((278.2, 297.854935982), (270.94209821, 286.380025652), (257.464005186, 288.020670003))
            Line((257.464005186, 288.020670003), (49.87538072, 457.650118027))
            ThreePointArc((49.87538072, 457.650118027), (45.227339921, 466.847798927), (48.931119413, 476.464640127))
            Line((48.931119413, 476.464640127), (51.713147519, 479.246668232))
            ThreePointArc((51.713147519, 479.246668232), (58.68186852, 482.80609817), (66.414254679, 481.604924508))
            Line((66.414254679, 481.604924508), (276.666801451, 375.521916556))
            ThreePointArc((276.666801451, 375.521916556), (283.00874198, 368.155690599), (282.284462808, 358.462553119))
        make_face(mode=Mode.SUBTRACT)
        with Locations((372.179031838, 208.543385896)):
            Circle(CONVERT_FLANGE_TO_SHEET_OUTLINE_R, mode=Mode.SUBTRACT)
        with Locations((524.843385896, 55.879031838)):
            Circle(CONVERT_FLANGE_TO_SHEET_OUTLINE_R, mode=Mode.SUBTRACT)
        with Locations((468.964354058, 152.664354058)):
            Circle(CONVERT_FLANGE_TO_SHEET_OUTLINE_R, mode=Mode.SUBTRACT)
        with Locations((316.3, 341.3)):
            Circle(CONVERT_FLANGE_TO_SHEET_OUTLINE_R_2, mode=Mode.SUBTRACT)
    extrude(amount=CONVERT_FLANGE_TO_SHEET_DEPTH)


solid = Compound([body_2.part, body_3.part])
